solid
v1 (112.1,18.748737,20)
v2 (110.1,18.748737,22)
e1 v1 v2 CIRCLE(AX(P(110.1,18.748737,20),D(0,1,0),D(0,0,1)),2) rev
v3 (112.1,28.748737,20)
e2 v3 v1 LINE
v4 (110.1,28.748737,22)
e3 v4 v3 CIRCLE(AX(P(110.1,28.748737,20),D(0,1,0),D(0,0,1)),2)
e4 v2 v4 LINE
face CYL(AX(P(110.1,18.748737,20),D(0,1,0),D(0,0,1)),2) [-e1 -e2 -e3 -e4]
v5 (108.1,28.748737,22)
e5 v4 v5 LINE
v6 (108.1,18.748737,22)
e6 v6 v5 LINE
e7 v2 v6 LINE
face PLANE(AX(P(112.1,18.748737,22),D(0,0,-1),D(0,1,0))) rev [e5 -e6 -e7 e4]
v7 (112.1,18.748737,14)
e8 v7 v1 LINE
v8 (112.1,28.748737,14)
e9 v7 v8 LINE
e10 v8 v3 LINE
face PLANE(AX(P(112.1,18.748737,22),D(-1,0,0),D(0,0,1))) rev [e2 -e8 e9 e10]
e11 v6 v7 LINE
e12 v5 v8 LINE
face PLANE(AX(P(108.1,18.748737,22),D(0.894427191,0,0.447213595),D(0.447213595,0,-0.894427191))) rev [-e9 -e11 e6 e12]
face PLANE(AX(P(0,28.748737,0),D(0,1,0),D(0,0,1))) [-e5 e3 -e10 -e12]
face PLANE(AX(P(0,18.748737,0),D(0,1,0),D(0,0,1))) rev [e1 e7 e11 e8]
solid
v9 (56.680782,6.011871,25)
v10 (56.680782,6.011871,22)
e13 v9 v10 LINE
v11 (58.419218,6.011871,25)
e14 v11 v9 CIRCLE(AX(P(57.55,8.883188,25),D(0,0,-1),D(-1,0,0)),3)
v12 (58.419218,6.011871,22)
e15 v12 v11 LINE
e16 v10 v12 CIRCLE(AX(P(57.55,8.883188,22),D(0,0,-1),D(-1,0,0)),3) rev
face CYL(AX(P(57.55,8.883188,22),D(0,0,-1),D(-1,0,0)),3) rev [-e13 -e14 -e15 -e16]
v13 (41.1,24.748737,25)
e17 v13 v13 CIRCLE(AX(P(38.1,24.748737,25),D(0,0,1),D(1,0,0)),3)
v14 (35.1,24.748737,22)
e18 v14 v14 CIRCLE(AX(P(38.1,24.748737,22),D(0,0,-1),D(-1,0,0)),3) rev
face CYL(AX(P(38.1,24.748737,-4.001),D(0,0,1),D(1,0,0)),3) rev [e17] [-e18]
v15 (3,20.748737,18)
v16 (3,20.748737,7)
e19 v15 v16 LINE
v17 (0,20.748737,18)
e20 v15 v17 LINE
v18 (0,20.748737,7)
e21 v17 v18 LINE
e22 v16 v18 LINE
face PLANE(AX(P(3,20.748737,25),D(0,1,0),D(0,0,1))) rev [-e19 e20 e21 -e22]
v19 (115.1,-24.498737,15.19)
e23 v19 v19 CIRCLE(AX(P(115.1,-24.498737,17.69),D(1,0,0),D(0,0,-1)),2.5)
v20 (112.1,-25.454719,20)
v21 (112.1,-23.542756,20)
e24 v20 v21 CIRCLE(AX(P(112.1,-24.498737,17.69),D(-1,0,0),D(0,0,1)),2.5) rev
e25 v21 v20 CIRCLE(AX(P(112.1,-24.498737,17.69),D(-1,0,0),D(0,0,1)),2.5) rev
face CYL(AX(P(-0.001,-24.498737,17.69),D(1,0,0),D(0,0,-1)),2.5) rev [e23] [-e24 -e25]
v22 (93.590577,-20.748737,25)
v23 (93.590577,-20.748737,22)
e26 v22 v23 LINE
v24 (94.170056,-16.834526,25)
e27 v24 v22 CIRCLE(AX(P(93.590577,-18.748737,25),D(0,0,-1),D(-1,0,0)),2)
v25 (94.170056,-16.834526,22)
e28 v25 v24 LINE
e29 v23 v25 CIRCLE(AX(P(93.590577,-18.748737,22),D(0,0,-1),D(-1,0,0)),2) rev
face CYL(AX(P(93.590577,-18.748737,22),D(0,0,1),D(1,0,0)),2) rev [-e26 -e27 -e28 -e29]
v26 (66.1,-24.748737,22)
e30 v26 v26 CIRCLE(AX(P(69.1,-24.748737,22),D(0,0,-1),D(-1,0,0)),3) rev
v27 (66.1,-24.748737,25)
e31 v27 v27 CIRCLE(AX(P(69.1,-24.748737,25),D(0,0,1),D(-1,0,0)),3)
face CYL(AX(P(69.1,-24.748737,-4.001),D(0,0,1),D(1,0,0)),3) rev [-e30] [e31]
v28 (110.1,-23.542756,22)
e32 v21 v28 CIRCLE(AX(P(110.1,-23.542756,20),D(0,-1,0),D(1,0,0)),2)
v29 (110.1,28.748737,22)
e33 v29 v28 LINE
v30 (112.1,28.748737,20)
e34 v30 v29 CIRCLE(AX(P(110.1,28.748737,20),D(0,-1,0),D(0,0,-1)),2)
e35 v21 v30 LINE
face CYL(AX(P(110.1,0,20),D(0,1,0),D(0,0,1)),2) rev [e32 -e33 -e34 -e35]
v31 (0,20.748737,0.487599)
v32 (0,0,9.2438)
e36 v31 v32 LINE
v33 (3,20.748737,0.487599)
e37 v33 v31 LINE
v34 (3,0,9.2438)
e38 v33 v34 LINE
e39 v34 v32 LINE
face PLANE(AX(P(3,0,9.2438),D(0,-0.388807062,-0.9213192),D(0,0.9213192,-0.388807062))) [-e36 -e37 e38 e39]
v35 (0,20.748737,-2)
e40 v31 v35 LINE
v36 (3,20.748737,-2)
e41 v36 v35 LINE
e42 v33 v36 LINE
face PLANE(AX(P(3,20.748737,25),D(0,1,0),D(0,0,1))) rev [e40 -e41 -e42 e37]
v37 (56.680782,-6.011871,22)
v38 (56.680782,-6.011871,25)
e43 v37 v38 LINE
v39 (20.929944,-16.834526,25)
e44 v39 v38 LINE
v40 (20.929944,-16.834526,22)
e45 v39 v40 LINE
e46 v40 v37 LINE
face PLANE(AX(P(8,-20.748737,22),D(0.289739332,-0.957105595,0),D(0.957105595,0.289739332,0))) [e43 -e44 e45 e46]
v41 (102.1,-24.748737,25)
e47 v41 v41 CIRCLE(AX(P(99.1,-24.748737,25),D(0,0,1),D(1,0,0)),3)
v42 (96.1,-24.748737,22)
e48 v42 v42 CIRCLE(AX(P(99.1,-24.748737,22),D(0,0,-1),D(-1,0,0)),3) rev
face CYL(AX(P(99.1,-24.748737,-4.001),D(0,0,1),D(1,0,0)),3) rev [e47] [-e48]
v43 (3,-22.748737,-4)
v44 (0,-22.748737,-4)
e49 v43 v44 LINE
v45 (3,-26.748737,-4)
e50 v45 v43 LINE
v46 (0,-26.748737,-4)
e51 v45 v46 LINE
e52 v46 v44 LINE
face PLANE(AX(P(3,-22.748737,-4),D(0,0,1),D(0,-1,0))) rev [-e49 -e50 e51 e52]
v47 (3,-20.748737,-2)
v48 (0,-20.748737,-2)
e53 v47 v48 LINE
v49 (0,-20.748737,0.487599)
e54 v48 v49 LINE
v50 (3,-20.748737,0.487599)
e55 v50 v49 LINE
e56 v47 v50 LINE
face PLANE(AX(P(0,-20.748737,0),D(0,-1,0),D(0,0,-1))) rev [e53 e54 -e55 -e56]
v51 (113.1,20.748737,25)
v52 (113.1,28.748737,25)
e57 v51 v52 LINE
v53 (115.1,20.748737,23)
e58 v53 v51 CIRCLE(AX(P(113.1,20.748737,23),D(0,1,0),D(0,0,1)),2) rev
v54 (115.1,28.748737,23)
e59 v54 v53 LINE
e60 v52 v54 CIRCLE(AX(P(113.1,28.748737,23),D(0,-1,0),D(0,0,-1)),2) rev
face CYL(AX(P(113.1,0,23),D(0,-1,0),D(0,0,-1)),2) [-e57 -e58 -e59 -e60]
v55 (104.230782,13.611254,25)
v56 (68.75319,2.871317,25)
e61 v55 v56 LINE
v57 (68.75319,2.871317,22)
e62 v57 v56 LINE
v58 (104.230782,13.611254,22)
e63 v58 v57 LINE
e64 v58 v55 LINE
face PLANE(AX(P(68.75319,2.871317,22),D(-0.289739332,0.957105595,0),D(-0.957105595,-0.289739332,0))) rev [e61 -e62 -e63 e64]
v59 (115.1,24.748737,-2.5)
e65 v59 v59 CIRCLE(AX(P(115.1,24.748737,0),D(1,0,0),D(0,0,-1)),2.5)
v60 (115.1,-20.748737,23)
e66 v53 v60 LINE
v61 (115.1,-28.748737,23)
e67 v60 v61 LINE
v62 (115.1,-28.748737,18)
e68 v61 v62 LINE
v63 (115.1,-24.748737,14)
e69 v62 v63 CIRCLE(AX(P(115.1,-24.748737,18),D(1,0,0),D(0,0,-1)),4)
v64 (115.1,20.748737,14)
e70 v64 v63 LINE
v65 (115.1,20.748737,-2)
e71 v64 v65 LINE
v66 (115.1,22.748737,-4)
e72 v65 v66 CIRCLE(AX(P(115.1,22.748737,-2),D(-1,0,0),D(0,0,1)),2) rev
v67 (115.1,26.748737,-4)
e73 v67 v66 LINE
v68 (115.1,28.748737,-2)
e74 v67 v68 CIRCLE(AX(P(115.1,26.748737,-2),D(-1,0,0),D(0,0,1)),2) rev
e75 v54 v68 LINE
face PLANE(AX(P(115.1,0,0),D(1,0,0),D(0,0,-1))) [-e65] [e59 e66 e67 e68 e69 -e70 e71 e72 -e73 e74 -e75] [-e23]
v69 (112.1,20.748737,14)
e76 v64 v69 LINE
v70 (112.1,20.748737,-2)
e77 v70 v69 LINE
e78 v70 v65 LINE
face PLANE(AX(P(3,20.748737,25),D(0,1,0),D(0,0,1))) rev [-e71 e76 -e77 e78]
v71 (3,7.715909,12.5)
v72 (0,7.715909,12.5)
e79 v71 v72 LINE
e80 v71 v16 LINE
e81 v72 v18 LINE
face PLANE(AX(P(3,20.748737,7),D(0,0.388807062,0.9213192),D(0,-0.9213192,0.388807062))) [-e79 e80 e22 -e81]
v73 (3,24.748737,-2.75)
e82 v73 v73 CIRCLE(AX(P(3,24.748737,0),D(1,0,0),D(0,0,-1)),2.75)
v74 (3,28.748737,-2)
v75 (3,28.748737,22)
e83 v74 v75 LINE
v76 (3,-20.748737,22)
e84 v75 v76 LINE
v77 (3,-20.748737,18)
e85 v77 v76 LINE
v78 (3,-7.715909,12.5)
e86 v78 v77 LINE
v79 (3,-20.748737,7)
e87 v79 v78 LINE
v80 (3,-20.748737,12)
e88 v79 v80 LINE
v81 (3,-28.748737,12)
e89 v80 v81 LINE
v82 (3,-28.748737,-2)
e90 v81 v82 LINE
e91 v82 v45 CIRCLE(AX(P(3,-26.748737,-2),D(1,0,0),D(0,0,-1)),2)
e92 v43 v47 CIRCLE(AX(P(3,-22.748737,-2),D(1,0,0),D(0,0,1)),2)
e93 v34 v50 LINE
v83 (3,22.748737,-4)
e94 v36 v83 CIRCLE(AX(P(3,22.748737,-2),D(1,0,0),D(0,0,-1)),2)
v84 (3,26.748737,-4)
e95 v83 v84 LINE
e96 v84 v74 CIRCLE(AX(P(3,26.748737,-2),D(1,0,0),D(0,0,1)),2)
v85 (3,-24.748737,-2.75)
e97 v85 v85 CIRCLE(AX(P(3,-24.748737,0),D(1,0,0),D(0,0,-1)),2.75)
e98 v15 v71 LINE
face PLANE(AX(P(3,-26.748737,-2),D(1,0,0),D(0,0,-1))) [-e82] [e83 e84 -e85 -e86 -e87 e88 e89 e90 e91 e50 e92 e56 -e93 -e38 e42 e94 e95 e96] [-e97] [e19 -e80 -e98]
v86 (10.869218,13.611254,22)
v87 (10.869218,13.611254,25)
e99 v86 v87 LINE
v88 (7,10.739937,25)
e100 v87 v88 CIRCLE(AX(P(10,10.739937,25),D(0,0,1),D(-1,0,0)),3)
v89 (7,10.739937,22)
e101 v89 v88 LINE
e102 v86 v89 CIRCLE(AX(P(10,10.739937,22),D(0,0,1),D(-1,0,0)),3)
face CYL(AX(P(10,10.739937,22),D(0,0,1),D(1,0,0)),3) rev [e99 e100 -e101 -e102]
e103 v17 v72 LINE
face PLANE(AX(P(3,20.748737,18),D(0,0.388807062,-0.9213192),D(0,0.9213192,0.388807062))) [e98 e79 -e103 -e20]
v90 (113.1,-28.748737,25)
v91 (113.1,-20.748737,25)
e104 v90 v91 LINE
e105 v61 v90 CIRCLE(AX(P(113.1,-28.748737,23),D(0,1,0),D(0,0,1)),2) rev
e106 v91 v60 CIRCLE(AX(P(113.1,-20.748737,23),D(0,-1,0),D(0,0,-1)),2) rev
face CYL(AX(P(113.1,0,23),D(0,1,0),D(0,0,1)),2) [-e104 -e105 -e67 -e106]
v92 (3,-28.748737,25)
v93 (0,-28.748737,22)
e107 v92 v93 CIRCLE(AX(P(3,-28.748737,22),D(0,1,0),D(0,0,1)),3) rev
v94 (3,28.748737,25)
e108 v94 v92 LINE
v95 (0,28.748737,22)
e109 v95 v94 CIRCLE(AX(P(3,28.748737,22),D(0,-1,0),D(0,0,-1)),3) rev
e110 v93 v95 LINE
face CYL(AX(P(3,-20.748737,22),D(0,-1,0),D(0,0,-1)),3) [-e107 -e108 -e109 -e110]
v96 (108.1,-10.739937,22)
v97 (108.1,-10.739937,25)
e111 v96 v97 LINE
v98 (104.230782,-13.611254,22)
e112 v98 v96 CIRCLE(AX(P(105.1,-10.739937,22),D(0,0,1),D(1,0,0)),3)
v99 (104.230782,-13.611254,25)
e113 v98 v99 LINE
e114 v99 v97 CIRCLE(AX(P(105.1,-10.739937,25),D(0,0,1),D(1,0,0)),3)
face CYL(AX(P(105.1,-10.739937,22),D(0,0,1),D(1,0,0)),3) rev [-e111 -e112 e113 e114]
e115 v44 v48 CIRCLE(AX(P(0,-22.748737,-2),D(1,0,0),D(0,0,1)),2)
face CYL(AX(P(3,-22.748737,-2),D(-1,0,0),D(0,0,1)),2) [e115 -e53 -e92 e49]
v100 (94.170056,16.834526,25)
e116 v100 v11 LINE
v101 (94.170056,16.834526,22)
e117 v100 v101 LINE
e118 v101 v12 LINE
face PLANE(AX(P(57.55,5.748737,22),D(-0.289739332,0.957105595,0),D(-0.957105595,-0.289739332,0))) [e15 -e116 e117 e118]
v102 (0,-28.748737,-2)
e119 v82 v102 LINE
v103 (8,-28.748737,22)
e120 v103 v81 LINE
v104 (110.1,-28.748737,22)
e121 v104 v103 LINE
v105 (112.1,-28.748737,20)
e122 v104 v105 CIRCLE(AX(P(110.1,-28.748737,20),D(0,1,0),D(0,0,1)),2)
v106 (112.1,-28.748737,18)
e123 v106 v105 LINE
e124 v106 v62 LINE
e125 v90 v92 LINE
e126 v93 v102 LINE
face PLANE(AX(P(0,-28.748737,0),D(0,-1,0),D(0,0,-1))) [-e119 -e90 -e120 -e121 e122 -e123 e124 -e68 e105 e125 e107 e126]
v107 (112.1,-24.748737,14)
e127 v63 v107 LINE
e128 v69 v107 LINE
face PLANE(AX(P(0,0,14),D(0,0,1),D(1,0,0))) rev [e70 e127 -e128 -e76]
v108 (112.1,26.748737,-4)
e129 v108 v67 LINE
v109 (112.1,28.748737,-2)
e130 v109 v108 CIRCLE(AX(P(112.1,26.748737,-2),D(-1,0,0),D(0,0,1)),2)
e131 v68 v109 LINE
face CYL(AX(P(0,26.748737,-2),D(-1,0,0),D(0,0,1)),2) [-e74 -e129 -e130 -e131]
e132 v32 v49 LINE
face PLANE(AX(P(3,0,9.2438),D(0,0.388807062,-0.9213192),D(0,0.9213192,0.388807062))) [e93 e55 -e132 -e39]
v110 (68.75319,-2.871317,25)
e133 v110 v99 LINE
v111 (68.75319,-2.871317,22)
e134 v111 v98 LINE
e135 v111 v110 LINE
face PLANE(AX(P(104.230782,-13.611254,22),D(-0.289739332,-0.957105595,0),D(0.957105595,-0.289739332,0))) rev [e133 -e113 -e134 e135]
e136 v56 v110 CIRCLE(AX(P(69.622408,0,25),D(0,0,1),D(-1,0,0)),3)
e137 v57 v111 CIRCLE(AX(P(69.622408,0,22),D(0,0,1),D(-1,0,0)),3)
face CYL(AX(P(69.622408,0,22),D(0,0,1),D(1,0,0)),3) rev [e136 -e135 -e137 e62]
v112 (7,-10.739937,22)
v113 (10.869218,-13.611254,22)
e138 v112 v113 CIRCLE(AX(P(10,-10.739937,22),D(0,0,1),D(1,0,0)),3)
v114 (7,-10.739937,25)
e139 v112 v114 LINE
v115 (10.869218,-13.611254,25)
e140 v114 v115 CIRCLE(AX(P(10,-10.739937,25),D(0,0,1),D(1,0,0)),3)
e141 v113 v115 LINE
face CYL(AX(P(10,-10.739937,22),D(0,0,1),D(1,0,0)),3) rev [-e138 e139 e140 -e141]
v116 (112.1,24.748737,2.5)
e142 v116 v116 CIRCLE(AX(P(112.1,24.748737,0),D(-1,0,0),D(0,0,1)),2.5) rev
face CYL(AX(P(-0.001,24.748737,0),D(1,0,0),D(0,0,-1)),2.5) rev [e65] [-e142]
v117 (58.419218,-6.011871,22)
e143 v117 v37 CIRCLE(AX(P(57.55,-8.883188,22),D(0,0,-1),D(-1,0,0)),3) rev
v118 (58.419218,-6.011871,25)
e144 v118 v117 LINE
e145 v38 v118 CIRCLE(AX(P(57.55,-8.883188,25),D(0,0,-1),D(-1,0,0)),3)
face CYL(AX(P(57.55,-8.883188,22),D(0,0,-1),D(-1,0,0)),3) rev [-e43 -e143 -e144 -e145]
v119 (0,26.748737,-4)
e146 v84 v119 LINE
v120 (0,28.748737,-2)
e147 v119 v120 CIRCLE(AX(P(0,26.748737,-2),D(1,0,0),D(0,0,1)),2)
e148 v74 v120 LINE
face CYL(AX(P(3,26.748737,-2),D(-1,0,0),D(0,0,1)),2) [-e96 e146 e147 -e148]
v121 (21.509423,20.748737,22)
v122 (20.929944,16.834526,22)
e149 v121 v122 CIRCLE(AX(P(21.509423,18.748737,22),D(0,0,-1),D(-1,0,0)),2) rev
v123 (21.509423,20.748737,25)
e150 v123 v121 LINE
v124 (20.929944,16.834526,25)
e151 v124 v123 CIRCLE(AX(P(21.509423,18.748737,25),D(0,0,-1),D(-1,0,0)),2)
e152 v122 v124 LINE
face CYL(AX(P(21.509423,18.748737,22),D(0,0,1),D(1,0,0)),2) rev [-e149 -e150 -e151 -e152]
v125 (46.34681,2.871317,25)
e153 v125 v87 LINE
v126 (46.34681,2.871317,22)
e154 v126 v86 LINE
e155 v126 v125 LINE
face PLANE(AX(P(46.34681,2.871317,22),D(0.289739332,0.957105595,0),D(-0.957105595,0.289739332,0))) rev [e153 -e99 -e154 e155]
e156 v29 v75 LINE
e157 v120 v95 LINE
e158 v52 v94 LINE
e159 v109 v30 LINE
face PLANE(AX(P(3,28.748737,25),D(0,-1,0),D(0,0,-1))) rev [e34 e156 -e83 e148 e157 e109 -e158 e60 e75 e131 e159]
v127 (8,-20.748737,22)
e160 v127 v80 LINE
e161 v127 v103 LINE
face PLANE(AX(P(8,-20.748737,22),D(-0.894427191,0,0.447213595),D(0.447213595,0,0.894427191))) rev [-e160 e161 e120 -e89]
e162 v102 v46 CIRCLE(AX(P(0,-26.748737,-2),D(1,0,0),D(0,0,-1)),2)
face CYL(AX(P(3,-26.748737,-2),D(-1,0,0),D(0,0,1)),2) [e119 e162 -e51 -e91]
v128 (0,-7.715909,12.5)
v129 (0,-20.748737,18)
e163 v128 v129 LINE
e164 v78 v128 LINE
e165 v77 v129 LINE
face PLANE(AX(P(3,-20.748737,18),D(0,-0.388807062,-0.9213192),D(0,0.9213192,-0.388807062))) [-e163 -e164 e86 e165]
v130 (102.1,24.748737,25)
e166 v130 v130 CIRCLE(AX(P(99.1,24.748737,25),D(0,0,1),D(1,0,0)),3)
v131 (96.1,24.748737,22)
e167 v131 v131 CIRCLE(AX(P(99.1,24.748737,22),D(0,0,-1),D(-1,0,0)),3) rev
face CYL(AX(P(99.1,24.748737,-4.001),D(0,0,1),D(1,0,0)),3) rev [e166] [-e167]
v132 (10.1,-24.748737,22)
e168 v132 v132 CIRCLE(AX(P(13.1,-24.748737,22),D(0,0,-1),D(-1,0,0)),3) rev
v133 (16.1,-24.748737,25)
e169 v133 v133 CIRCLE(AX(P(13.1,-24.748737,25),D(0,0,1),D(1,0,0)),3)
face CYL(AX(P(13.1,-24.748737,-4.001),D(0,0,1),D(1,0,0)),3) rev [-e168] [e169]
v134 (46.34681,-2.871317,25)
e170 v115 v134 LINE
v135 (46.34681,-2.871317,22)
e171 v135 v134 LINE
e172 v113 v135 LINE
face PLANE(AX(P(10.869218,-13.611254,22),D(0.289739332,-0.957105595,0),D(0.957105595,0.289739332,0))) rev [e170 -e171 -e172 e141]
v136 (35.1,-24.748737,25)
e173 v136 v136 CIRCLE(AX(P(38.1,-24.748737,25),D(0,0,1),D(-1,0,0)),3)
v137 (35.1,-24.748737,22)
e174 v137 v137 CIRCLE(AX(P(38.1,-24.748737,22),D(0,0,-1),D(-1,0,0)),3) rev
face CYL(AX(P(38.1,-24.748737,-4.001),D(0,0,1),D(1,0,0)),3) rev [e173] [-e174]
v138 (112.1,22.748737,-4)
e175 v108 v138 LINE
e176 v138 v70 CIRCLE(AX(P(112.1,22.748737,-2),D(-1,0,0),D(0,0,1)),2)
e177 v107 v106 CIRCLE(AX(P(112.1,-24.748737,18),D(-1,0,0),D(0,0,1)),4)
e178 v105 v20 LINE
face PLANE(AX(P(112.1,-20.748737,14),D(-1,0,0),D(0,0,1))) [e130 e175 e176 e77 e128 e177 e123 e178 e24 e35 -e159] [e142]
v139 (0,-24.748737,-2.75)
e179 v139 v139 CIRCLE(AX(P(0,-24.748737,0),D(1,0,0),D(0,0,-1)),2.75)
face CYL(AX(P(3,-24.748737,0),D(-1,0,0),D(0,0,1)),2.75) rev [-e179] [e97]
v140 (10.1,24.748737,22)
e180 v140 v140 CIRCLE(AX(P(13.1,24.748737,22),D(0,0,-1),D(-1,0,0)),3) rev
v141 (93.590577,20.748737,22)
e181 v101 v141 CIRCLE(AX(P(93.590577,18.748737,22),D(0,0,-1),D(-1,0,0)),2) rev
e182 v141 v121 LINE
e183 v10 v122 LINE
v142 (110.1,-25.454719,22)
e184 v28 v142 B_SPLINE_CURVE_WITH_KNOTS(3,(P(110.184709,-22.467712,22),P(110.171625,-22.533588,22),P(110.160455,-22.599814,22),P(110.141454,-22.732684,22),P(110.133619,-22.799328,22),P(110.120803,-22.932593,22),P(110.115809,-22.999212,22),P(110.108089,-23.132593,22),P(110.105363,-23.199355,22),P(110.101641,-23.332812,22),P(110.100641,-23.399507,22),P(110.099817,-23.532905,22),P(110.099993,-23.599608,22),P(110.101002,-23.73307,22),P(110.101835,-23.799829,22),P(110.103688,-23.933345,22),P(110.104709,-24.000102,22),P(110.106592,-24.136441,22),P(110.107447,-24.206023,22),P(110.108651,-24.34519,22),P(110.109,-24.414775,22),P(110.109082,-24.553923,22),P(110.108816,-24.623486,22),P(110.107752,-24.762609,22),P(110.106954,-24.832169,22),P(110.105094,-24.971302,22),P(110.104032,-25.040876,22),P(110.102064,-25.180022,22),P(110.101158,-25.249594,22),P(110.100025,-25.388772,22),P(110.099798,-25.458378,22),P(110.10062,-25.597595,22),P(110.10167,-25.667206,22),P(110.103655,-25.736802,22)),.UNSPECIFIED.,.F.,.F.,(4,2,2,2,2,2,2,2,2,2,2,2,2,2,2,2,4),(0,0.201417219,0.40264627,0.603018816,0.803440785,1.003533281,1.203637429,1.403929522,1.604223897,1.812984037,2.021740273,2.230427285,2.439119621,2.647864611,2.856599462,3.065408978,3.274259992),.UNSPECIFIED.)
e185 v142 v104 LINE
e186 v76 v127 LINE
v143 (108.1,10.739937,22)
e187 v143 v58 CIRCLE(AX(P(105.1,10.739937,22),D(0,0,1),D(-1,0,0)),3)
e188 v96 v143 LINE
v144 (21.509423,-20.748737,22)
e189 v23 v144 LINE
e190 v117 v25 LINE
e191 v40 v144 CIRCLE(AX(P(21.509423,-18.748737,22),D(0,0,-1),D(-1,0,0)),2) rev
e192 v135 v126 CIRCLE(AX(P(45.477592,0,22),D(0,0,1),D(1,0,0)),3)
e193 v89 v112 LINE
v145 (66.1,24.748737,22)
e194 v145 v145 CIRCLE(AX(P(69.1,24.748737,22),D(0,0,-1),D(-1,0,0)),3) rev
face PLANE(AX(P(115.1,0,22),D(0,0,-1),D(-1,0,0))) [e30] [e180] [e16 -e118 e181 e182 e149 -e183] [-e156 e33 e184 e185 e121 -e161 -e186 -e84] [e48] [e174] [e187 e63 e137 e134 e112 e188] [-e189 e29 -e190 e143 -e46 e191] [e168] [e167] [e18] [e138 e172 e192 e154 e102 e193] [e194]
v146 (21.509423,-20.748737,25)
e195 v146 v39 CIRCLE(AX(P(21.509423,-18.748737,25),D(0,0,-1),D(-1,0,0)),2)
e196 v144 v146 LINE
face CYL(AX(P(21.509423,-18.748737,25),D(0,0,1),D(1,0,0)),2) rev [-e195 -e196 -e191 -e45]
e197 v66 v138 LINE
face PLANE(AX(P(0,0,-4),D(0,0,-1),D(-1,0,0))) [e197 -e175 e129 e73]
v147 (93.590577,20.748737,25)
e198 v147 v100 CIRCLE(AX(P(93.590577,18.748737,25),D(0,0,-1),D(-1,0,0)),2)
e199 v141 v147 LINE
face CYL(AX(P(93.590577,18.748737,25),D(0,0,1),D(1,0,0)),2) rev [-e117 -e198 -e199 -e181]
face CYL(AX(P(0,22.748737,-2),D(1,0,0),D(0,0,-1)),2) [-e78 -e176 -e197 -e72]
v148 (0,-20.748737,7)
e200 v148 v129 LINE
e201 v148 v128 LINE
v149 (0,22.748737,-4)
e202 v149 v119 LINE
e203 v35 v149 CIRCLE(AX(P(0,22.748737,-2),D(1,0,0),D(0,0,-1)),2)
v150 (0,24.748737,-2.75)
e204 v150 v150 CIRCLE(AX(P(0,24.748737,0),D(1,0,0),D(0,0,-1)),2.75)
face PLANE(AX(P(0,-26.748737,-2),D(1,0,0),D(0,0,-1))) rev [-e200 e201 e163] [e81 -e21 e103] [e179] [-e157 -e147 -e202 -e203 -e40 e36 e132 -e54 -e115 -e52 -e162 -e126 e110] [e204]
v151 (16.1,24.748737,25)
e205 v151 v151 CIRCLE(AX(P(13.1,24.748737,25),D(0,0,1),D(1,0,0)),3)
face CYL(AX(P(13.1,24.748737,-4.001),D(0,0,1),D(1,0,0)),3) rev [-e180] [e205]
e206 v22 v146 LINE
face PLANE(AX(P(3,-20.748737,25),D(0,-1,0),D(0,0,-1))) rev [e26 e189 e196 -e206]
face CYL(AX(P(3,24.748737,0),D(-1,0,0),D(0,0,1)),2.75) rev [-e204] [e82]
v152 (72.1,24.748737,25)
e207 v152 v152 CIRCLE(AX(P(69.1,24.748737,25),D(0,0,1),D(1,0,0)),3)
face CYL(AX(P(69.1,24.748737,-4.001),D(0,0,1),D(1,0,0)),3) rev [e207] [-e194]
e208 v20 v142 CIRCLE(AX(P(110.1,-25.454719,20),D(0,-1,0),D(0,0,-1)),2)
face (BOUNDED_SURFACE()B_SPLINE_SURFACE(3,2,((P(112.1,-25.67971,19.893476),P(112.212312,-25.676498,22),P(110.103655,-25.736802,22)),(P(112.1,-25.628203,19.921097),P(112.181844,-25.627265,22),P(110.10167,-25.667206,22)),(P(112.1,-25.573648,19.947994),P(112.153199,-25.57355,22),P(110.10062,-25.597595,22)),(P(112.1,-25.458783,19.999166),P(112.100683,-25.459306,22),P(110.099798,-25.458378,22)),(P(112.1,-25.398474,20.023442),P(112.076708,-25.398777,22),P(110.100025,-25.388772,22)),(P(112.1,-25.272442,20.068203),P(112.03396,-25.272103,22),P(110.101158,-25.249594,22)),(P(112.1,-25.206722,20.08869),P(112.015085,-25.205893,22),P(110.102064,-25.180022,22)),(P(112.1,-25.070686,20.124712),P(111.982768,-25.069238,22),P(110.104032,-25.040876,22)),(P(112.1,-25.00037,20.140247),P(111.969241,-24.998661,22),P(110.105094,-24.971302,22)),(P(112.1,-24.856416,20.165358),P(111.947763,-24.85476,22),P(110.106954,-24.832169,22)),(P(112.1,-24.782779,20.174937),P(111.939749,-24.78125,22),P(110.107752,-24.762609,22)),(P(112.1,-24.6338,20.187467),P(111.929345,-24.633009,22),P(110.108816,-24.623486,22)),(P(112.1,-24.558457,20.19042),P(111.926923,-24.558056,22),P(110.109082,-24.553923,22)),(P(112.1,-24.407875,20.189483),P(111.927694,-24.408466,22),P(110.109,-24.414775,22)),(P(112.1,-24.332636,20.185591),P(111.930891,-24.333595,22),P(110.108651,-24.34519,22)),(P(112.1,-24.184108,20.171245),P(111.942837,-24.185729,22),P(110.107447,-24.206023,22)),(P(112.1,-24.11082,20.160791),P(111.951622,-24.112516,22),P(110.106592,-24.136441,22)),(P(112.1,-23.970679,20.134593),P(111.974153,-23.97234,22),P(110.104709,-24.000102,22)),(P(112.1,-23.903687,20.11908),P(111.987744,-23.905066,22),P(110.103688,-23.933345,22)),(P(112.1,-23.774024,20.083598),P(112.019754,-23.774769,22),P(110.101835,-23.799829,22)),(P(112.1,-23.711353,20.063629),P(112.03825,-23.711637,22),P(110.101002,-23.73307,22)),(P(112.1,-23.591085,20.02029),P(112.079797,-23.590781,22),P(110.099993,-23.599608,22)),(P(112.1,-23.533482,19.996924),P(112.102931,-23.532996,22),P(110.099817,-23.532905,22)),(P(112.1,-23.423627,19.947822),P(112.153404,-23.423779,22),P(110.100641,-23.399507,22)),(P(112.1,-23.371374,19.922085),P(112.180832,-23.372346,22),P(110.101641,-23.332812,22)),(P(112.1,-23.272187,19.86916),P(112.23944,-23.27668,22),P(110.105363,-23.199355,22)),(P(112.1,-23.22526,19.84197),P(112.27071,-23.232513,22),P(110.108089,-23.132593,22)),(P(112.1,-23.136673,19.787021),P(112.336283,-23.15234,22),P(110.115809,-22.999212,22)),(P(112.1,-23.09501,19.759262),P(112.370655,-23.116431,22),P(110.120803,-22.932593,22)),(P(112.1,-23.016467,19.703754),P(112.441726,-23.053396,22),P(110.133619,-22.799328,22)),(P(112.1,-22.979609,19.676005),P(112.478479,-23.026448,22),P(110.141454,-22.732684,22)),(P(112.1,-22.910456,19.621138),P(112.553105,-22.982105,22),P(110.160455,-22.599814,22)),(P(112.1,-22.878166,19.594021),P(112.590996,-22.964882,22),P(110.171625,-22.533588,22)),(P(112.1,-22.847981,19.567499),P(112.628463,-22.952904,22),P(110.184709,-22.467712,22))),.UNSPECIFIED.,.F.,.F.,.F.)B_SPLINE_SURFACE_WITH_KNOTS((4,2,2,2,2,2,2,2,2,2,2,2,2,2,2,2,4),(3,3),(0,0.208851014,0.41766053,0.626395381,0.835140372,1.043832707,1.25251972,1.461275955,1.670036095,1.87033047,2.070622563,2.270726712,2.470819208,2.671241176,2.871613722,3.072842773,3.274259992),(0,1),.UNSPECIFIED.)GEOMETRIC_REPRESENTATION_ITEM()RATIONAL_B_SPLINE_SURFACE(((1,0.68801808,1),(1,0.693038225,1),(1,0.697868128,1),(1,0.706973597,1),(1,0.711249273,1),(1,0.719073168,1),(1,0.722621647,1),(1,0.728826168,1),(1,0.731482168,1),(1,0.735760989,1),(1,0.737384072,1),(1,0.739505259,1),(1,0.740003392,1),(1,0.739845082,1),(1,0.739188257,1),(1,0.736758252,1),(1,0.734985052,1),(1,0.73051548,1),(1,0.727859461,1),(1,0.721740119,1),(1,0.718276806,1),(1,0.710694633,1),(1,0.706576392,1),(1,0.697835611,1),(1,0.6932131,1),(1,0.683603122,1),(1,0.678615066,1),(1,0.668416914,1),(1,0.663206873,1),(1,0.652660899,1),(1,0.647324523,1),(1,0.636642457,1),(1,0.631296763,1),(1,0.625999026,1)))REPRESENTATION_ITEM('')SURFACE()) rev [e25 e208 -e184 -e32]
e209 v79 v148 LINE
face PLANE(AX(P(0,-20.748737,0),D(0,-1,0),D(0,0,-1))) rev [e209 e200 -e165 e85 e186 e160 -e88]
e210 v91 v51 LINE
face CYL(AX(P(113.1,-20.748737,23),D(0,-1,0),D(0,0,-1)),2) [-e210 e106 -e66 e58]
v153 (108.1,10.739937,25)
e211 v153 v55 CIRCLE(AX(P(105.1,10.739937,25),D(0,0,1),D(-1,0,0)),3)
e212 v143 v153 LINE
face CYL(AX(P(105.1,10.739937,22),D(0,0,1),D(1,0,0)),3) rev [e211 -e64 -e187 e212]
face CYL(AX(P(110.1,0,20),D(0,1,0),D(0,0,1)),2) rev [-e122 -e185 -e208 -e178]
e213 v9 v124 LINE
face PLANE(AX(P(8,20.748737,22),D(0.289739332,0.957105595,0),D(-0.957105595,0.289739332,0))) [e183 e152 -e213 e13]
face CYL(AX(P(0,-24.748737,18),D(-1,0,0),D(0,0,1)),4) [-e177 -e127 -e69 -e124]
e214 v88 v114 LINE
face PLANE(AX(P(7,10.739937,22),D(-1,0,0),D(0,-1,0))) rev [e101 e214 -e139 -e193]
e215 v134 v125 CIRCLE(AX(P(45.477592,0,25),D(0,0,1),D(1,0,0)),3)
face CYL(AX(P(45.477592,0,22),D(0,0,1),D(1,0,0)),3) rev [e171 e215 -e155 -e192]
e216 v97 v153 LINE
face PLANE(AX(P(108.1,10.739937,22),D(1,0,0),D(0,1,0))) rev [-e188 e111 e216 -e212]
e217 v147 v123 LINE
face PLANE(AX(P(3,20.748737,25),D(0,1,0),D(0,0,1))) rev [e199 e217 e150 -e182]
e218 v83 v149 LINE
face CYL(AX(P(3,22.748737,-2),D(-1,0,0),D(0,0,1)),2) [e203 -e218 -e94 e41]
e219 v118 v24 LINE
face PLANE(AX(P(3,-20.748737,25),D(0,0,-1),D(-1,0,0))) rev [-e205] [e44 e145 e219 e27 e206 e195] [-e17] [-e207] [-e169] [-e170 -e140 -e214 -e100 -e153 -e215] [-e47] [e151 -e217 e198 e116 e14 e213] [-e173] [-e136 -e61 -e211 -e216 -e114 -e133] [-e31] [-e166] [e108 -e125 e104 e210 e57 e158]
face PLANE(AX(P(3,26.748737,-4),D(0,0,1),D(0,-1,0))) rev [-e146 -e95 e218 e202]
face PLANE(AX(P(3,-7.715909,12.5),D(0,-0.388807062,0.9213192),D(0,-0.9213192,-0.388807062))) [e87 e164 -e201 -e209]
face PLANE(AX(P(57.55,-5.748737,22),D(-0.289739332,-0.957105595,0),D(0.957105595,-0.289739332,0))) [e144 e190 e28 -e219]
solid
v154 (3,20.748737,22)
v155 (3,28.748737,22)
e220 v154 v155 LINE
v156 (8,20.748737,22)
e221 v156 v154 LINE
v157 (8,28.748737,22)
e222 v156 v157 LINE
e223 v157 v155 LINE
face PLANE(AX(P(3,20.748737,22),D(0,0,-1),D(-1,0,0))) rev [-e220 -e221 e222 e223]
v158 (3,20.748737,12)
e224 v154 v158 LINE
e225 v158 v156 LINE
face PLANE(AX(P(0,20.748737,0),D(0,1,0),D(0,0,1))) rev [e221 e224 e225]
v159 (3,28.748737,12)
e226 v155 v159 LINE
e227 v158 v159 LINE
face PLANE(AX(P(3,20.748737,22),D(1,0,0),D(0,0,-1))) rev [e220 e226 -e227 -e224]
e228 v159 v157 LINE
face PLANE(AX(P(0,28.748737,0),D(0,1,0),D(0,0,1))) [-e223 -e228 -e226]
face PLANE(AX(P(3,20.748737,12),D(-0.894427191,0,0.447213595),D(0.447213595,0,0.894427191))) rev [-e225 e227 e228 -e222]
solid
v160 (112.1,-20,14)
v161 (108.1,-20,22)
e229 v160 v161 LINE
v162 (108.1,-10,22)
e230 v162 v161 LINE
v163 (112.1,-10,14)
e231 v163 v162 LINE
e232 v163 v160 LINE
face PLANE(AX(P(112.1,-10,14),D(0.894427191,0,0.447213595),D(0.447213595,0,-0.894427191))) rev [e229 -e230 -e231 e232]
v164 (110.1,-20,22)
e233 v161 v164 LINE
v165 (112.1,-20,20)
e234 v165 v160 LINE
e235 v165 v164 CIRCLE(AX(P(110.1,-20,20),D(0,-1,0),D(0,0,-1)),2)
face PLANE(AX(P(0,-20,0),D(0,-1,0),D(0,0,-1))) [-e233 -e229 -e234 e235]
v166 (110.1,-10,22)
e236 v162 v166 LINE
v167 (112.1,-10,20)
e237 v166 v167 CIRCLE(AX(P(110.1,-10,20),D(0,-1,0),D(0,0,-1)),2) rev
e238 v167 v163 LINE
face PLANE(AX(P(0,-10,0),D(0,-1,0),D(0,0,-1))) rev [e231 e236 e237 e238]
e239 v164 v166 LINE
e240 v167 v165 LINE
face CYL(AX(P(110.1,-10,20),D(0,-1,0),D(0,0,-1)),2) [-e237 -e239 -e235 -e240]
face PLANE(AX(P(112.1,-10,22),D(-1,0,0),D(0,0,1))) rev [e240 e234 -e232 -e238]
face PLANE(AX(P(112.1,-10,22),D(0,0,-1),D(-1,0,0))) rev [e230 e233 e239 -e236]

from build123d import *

# Parameters (mm, degrees)
SKETCH1_R             = 2.75
BOSS_EXTRUDE1_DEPTH   = 3
BOSS_EXTRUDE1_2_DEPTH = 3
SKETCH2_W             = 3
SKETCH2_H             = 8
BOSS_EXTRUDE3_DEPTH   = 112.1
SKETCH2_3_W           = 3
SKETCH2_3_H           = 8
BOSS_EXTRUDE4_DEPTH   = 112.1
SKETCH3_W             = 3
SKETCH3_H             = 8
BOSS_EXTRUDE5_DEPTH   = 26
SKETCH3_3_W           = 3
SKETCH3_3_H           = 8
BOSS_EXTRUDE6_DEPTH   = 8
FILLET1_R             = 2
FILLET2_R             = 2
FILLET4_R             = 2
SKETCH6_R             = 2.5
CUT_EXTRUDE1_DEPTH    = 3
SKETCH5_R             = 2.5
CUT_EXTRUDE2_DEPTH    = 3
BOSS_EXTRUDE7_DEPTH   = 3
FILLET6_R             = 4
FILLET7_R             = 3
FILLET8_START         = -30
FILLET8_DEPTH         = 60
GUSSET5_THICKNESS     = 8
GUSSET6_THICKNESS     = 8
FILLET14_R            = 2
BOSS_EXTRUDE15_REACH  = 129.762
SKETCH20_W            = 3
SKETCH20_H            = 8
GUSSET7_THICKNESS     = 10
FILLET15_R            = 2
FILLET16_R            = 2
FILLET18_R            = 2
GUSSET8_START         = -20
GUSSET8_DEPTH         = 10
FILLET19_R            = 2
SKETCH10_R            = 3
CUT_EXTRUDE3_DEPTH    = 3
BOSS_EXTRUDE16_DEPTH  = 3


with BuildPart() as part:
    # Sketch1 → Boss-Extrude1 (new body)
    with BuildSketch(Plane(origin=(0, 0, 0), x_dir=(0, 0, -1), z_dir=(1, 0, 0))):
        with BuildLine():
            Line((-25, 28.748737342), (2, 28.748737342))
            ThreePointArc((2, 28.748737342), (3.414213562, 28.162950904), (4, 26.748737342))
            Line((4, 26.748737342), (4, 22.748737342))
            ThreePointArc((4, 22.748737342), (3.414213562, 21.334523779), (2, 20.748737342))
            Line((2, 20.748737342), (-25, 20.748737342))
            Line((-25, 20.748737342), (-25, 28.748737342))
        make_face()
        with Locations((0, 24.748737342)):
            Circle(SKETCH1_R, mode=Mode.SUBTRACT)
    extrude(amount=BOSS_EXTRUDE1_DEPTH)

    # Sketch2 → Boss-Extrude3 (add)
    with BuildSketch(Plane(origin=(3, 0, 0), x_dir=(0, 0, -1), z_dir=(1, 0, 0))):
        with Locations((-23.5, 24.748737342)):
            Rectangle(SKETCH2_W, SKETCH2_H)
    extrude(amount=BOSS_EXTRUDE3_DEPTH)

    # Sketch3 → Boss-Extrude5 (add)
    with BuildSketch(Plane(origin=(0, 0, 22), x_dir=(-1, 0, 0), z_dir=(0, 0, -1))):
        with Locations((-113.6, 24.748737342)):
            Rectangle(SKETCH3_W, SKETCH3_H)
    extrude(amount=BOSS_EXTRUDE5_DEPTH)

    # Fillet1
    fillet1_edges = [part.edges().sort_by_distance(p)[0] for p in [
        (115.1, 24.748737342, 25),
        (0, 24.748737342, 25),
    ]]
    fillet(fillet1_edges, radius=FILLET1_R)

    # Fillet4
    fillet4_edges = [part.edges().sort_by_distance(p)[0] for p in [
        (113.6, 28.748737342, -4),
        (113.6, 20.748737342, -4),
    ]]
    fillet(fillet4_edges, radius=FILLET4_R)

    # Sketch5 → Cut-Extrude2 (cut)
    with BuildSketch(Plane(origin=(115.1, 0, 0), x_dir=(0, 0, -1), z_dir=(1, 0, 0))):
        with Locations((0, 24.748737342)):
            Circle(SKETCH5_R)
    extrude(amount=-CUT_EXTRUDE2_DEPTH, mode=Mode.SUBTRACT)



with BuildPart() as body_2:
    # Sketch1 → Boss-Extrude1 2 (new body)
    with BuildSketch(Plane(origin=(0, 0, 0), x_dir=(0, 0, -1), z_dir=(1, 0, 0))):
        with BuildLine():
            Line((-25, -20.748737342), (2, -20.748737342))
            ThreePointArc((2, -20.748737342), (3.414213562, -21.334523779), (4, -22.748737342))
            Line((4, -22.748737342), (4, -26.748737342))
            ThreePointArc((4, -26.748737342), (3.414213562, -28.162950904), (2, -28.748737342))
            Line((2, -28.748737342), (-25, -28.748737342))
            Line((-25, -28.748737342), (-25, -20.748737342))
        make_face()
        with Locations((0, -24.748737342)):
            Circle(SKETCH1_R, mode=Mode.SUBTRACT)
    extrude(amount=BOSS_EXTRUDE1_2_DEPTH)

    # Sketch2<3> → Boss-Extrude4 (add)
    with BuildSketch(Plane(origin=(3, 0, 0), x_dir=(0, 0, -1), z_dir=(1, 0, 0))):
        with Locations((-23.5, -24.748737342)):
            Rectangle(SKETCH2_3_W, SKETCH2_3_H)
    extrude(amount=BOSS_EXTRUDE4_DEPTH)

    # Sketch3<3> → Boss-Extrude6 (add)
    with BuildSketch(Plane(origin=(0, 0, 22), x_dir=(-1, 0, 0), z_dir=(0, 0, -1))):
        with Locations((-113.6, -24.748737342)):
            Rectangle(SKETCH3_3_W, SKETCH3_3_H)
    extrude(amount=BOSS_EXTRUDE6_DEPTH)

    # Fillet2
    fillet2_edges = [body_2.edges().sort_by_distance(p)[0] for p in [
        (115.1, -24.748737342, 25),
        (0, -24.748737342, 25),
    ]]
    fillet(fillet2_edges, radius=FILLET2_R)

    # Sketch6 → Cut-Extrude1 (cut)
    with BuildSketch(Plane(origin=(115.1, 0, 0), x_dir=(0, 0, -1), z_dir=(1, 0, 0))):
        with Locations((-17.69, -24.498737342)):
            Circle(SKETCH6_R)
    extrude(amount=-CUT_EXTRUDE1_DEPTH, mode=Mode.SUBTRACT)


with BuildPart() as part_1:
    add(part.part)

    add(body_2.part)  # Boss-Extrude7 merges body 2
    # Sketch7 → Boss-Extrude7 (add)
    with BuildSketch(Plane.XY.offset(25)):
        Polygon((0, -20.748737342), (0, 20.748737342), (8, 20.748737342), (57.55, 5.748737342), (107.1, 20.748737342), (115.1, 20.748737342), (115.1, -20.748737342), (107.1, -20.748737342), (57.55, -5.748737342), (8, -20.748737342), align=None)
        with BuildLine():
            Line((7, 10.739937144), (7, -10.739937144))
            ThreePointArc((7, -10.739937144), (8.212215616, -13.149050465), (10.869217997, -13.611253928))
            Line((10.869217997, -13.611253928), (46.346810362, -2.871316784))
            ThreePointArc((46.346810362, -2.871316784), (48.477592365, 0), (46.346810362, 2.871316784))
            Line((46.346810362, 2.871316784), (10.869217997, 13.611253928))
            ThreePointArc((10.869217997, 13.611253928), (8.212215616, 13.149050465), (7, 10.739937144))
        make_face(mode=Mode.SUBTRACT)
        with BuildLine():
            Line((104.230782003, -13.611253928), (68.753189638, -2.871316784))
            ThreePointArc((68.753189638, -2.871316784), (66.622407635, 0), (68.753189638, 2.871316784))
            Line((68.753189638, 2.871316784), (104.230782003, 13.611253928))
            ThreePointArc((104.230782003, 13.611253928), (106.887784384, 13.149050465), (108.1, 10.739937144))
            Line((108.1, 10.739937144), (108.1, -10.739937144))
            ThreePointArc((108.1, -10.739937144), (106.887784384, -13.149050465), (104.230782003, -13.611253928))
        make_face(mode=Mode.SUBTRACT)
    extrude(amount=-BOSS_EXTRUDE7_DEPTH)

    # Fillet6
    fillet6_edges = [part_1.edges().sort_by_distance(p)[0] for p in [
        (113.6, -28.748737342, 14),
    ]]
    fillet(fillet6_edges, radius=FILLET6_R)

    # Fillet7
    fillet7_edges = [part_1.edges().sort_by_distance(p)[0] for p in [
        (57.55, -5.748737342, 23.5),
        (57.55, 5.748737342, 23.5),
    ]]
    fillet(fillet7_edges, radius=FILLET7_R)

    # Fillet8: read off the stored shape, not the designer's step
    # Fillet8 outline → Fillet8 (cut)
    with BuildSketch(Plane(origin=(0, 0, 0), x_dir=(1, 0, 0), z_dir=(0, 1, 0)).offset(FILLET8_START)):
        with BuildLine():
            ThreePointArc((3, -25), (0.878679656, -24.121320344), (0, -22))
            Line((0, -22), (0, -25))
            Line((0, -25), (3, -25))
        make_face()
    extrude(amount=FILLET8_DEPTH, mode=Mode.SUBTRACT)

    # Fillet14
    fillet14_edges = [part_1.edges().sort_by_distance(p)[0] for p in [
        (115.1, 0, 25),
    ]]
    fillet(fillet14_edges, radius=FILLET14_R)

    # Sketch20 → Boss-Extrude15 (add, up to next)
    with BuildSketch(Plane(origin=(0, -20.748737342, 0), x_dir=(1, 0, 0), z_dir=(0, 1, 0)), mode=Mode.PRIVATE) as boss_extrude15_sk1:
        with Locations((113.6, -18)):
            Rectangle(SKETCH20_W, SKETCH20_H)
    boss_extrude15_tool1 = extrude(boss_extrude15_sk1.sketch, amount=BOSS_EXTRUDE15_REACH, mode=Mode.PRIVATE) - part_1.part
    add(boss_extrude15_tool1.solids().sort_by_distance((113.6, -20.748737, 18))[0])

    # Fillet15
    fillet15_edges = [part_1.edges().sort_by_distance(p)[0] for p in [
        (112.1, 0, 22),
    ]]
    fillet(fillet15_edges, radius=FILLET15_R)

    # Fillet18
    fillet18_edges = [part_1.edges().sort_by_distance(p)[0] for p in [
        (8, -20.748737342, 23.5),
        (8, 20.748737342, 23.5),
        (107.1, 20.748737342, 23.5),
        (107.1, -20.748737342, 23.5),
    ]]
    fillet(fillet18_edges, radius=FILLET18_R)

    # Sketch10 → Cut-Extrude3 (cut)
    with BuildSketch(Plane.XY.offset(25)):
        with Locations((38.1, 24.748737342)):
            Circle(SKETCH10_R)
        with Locations((69.1, 24.748737342)):
            Circle(SKETCH10_R)
        with Locations(Location((69.1, -24.748737342, 0), (0, 0, 180))):
            Circle(SKETCH10_R)
        with Locations(Location((38.1, -24.748737342, 0), (0, 0, 180))):
            Circle(SKETCH10_R)
        with Locations((13.1, 24.748737342)):
            Circle(SKETCH10_R)
        with Locations((13.1, -24.748737342)):
            Circle(SKETCH10_R)
        with Locations((99.1, 24.748737342)):
            Circle(SKETCH10_R)
        with Locations((99.1, -24.748737342)):
            Circle(SKETCH10_R)
    extrude(amount=-CUT_EXTRUDE3_DEPTH, mode=Mode.SUBTRACT)


with BuildPart() as body_2_2:
    # Gusset5: a gusset: a plate 8.0 thick in the corner of two members, its outline drawn in place
    gusset5_outline = Wire([Line((3, 20.748737342, 22), (3, 20.748737342, 12)), Line((3, 20.748737342, 12), (8, 20.748737342, 22)), Line((8, 20.748737342, 22), (3, 20.748737342, 22))])
    add(extrude(Face(gusset5_outline), amount=GUSSET5_THICKNESS, dir=(0, 1, 0)))


with BuildPart() as body_3:
    # Gusset6: a gusset: a plate 8.0 thick in the corner of two members, its outline drawn in place
    gusset6_outline = Wire([Line((3, -20.748737342, 22), (8, -20.748737342, 22)), Line((8, -20.748737342, 22), (3, -20.748737342, 12)), Line((3, -20.748737342, 12), (3, -20.748737342, 22))])
    add(extrude(Face(gusset6_outline), amount=GUSSET6_THICKNESS, dir=(0, -1, 0)))


    add(part_1.part)  # Boss-Extrude16 merges part
    # Sketch13 → Boss-Extrude16 (add)
    with BuildSketch(Plane.ZY):
        Polygon((7, 20.748737342), (12.5, 7.715909239), (18, 20.748737342), (22, 20.748737342), (22, 14.251262658), (22, -14.251262658), (22, -20.748737342), (18, -20.748737342), (12.5, -7.715909239), (7, -20.748737342), (0.487599088, -20.748737342), (9.243799544, 0), (0.487599088, 20.748737342), align=None)
    extrude(amount=-BOSS_EXTRUDE16_DEPTH)


with BuildPart() as body_4:
    # Gusset7: a gusset: a plate 10.0 thick in the corner of two members, its outline drawn in place
    gusset7_outline = Wire([Line((112.1, 18.748737342, 22), (108.1, 18.748737342, 22)), Line((108.1, 18.748737342, 22), (112.1, 18.748737342, 14)), Line((112.1, 18.748737342, 14), (112.1, 18.748737342, 22))])
    add(extrude(Face(gusset7_outline), amount=GUSSET7_THICKNESS, dir=(0, 1, 0)))

    # Fillet16
    fillet16_edges = [body_4.edges().sort_by_distance(p)[0] for p in [
        (112.1, 23.748737342, 22),
    ]]
    fillet(fillet16_edges, radius=FILLET16_R)


with BuildPart() as body_5:
    # Gusset8: read off the stored shape, not the designer's step
    # Gusset8 outline → Gusset8 (new body)
    with BuildSketch(Plane(origin=(0, 0, 0), x_dir=(1, 0, 0), z_dir=(0, 1, 0)).offset(GUSSET8_START)):
        Polygon((112.1, -14), (108.1, -22), (112.1, -22), align=None)
    extrude(amount=GUSSET8_DEPTH)

    # Fillet19
    fillet19_edges = [body_5.edges().sort_by_distance(p)[0] for p in [
        (112.1, -15, 22),
    ]]
    fillet(fillet19_edges, radius=FILLET19_R)


solid = Compound([body_2_2.part, body_3.part, body_4.part, body_5.part])
